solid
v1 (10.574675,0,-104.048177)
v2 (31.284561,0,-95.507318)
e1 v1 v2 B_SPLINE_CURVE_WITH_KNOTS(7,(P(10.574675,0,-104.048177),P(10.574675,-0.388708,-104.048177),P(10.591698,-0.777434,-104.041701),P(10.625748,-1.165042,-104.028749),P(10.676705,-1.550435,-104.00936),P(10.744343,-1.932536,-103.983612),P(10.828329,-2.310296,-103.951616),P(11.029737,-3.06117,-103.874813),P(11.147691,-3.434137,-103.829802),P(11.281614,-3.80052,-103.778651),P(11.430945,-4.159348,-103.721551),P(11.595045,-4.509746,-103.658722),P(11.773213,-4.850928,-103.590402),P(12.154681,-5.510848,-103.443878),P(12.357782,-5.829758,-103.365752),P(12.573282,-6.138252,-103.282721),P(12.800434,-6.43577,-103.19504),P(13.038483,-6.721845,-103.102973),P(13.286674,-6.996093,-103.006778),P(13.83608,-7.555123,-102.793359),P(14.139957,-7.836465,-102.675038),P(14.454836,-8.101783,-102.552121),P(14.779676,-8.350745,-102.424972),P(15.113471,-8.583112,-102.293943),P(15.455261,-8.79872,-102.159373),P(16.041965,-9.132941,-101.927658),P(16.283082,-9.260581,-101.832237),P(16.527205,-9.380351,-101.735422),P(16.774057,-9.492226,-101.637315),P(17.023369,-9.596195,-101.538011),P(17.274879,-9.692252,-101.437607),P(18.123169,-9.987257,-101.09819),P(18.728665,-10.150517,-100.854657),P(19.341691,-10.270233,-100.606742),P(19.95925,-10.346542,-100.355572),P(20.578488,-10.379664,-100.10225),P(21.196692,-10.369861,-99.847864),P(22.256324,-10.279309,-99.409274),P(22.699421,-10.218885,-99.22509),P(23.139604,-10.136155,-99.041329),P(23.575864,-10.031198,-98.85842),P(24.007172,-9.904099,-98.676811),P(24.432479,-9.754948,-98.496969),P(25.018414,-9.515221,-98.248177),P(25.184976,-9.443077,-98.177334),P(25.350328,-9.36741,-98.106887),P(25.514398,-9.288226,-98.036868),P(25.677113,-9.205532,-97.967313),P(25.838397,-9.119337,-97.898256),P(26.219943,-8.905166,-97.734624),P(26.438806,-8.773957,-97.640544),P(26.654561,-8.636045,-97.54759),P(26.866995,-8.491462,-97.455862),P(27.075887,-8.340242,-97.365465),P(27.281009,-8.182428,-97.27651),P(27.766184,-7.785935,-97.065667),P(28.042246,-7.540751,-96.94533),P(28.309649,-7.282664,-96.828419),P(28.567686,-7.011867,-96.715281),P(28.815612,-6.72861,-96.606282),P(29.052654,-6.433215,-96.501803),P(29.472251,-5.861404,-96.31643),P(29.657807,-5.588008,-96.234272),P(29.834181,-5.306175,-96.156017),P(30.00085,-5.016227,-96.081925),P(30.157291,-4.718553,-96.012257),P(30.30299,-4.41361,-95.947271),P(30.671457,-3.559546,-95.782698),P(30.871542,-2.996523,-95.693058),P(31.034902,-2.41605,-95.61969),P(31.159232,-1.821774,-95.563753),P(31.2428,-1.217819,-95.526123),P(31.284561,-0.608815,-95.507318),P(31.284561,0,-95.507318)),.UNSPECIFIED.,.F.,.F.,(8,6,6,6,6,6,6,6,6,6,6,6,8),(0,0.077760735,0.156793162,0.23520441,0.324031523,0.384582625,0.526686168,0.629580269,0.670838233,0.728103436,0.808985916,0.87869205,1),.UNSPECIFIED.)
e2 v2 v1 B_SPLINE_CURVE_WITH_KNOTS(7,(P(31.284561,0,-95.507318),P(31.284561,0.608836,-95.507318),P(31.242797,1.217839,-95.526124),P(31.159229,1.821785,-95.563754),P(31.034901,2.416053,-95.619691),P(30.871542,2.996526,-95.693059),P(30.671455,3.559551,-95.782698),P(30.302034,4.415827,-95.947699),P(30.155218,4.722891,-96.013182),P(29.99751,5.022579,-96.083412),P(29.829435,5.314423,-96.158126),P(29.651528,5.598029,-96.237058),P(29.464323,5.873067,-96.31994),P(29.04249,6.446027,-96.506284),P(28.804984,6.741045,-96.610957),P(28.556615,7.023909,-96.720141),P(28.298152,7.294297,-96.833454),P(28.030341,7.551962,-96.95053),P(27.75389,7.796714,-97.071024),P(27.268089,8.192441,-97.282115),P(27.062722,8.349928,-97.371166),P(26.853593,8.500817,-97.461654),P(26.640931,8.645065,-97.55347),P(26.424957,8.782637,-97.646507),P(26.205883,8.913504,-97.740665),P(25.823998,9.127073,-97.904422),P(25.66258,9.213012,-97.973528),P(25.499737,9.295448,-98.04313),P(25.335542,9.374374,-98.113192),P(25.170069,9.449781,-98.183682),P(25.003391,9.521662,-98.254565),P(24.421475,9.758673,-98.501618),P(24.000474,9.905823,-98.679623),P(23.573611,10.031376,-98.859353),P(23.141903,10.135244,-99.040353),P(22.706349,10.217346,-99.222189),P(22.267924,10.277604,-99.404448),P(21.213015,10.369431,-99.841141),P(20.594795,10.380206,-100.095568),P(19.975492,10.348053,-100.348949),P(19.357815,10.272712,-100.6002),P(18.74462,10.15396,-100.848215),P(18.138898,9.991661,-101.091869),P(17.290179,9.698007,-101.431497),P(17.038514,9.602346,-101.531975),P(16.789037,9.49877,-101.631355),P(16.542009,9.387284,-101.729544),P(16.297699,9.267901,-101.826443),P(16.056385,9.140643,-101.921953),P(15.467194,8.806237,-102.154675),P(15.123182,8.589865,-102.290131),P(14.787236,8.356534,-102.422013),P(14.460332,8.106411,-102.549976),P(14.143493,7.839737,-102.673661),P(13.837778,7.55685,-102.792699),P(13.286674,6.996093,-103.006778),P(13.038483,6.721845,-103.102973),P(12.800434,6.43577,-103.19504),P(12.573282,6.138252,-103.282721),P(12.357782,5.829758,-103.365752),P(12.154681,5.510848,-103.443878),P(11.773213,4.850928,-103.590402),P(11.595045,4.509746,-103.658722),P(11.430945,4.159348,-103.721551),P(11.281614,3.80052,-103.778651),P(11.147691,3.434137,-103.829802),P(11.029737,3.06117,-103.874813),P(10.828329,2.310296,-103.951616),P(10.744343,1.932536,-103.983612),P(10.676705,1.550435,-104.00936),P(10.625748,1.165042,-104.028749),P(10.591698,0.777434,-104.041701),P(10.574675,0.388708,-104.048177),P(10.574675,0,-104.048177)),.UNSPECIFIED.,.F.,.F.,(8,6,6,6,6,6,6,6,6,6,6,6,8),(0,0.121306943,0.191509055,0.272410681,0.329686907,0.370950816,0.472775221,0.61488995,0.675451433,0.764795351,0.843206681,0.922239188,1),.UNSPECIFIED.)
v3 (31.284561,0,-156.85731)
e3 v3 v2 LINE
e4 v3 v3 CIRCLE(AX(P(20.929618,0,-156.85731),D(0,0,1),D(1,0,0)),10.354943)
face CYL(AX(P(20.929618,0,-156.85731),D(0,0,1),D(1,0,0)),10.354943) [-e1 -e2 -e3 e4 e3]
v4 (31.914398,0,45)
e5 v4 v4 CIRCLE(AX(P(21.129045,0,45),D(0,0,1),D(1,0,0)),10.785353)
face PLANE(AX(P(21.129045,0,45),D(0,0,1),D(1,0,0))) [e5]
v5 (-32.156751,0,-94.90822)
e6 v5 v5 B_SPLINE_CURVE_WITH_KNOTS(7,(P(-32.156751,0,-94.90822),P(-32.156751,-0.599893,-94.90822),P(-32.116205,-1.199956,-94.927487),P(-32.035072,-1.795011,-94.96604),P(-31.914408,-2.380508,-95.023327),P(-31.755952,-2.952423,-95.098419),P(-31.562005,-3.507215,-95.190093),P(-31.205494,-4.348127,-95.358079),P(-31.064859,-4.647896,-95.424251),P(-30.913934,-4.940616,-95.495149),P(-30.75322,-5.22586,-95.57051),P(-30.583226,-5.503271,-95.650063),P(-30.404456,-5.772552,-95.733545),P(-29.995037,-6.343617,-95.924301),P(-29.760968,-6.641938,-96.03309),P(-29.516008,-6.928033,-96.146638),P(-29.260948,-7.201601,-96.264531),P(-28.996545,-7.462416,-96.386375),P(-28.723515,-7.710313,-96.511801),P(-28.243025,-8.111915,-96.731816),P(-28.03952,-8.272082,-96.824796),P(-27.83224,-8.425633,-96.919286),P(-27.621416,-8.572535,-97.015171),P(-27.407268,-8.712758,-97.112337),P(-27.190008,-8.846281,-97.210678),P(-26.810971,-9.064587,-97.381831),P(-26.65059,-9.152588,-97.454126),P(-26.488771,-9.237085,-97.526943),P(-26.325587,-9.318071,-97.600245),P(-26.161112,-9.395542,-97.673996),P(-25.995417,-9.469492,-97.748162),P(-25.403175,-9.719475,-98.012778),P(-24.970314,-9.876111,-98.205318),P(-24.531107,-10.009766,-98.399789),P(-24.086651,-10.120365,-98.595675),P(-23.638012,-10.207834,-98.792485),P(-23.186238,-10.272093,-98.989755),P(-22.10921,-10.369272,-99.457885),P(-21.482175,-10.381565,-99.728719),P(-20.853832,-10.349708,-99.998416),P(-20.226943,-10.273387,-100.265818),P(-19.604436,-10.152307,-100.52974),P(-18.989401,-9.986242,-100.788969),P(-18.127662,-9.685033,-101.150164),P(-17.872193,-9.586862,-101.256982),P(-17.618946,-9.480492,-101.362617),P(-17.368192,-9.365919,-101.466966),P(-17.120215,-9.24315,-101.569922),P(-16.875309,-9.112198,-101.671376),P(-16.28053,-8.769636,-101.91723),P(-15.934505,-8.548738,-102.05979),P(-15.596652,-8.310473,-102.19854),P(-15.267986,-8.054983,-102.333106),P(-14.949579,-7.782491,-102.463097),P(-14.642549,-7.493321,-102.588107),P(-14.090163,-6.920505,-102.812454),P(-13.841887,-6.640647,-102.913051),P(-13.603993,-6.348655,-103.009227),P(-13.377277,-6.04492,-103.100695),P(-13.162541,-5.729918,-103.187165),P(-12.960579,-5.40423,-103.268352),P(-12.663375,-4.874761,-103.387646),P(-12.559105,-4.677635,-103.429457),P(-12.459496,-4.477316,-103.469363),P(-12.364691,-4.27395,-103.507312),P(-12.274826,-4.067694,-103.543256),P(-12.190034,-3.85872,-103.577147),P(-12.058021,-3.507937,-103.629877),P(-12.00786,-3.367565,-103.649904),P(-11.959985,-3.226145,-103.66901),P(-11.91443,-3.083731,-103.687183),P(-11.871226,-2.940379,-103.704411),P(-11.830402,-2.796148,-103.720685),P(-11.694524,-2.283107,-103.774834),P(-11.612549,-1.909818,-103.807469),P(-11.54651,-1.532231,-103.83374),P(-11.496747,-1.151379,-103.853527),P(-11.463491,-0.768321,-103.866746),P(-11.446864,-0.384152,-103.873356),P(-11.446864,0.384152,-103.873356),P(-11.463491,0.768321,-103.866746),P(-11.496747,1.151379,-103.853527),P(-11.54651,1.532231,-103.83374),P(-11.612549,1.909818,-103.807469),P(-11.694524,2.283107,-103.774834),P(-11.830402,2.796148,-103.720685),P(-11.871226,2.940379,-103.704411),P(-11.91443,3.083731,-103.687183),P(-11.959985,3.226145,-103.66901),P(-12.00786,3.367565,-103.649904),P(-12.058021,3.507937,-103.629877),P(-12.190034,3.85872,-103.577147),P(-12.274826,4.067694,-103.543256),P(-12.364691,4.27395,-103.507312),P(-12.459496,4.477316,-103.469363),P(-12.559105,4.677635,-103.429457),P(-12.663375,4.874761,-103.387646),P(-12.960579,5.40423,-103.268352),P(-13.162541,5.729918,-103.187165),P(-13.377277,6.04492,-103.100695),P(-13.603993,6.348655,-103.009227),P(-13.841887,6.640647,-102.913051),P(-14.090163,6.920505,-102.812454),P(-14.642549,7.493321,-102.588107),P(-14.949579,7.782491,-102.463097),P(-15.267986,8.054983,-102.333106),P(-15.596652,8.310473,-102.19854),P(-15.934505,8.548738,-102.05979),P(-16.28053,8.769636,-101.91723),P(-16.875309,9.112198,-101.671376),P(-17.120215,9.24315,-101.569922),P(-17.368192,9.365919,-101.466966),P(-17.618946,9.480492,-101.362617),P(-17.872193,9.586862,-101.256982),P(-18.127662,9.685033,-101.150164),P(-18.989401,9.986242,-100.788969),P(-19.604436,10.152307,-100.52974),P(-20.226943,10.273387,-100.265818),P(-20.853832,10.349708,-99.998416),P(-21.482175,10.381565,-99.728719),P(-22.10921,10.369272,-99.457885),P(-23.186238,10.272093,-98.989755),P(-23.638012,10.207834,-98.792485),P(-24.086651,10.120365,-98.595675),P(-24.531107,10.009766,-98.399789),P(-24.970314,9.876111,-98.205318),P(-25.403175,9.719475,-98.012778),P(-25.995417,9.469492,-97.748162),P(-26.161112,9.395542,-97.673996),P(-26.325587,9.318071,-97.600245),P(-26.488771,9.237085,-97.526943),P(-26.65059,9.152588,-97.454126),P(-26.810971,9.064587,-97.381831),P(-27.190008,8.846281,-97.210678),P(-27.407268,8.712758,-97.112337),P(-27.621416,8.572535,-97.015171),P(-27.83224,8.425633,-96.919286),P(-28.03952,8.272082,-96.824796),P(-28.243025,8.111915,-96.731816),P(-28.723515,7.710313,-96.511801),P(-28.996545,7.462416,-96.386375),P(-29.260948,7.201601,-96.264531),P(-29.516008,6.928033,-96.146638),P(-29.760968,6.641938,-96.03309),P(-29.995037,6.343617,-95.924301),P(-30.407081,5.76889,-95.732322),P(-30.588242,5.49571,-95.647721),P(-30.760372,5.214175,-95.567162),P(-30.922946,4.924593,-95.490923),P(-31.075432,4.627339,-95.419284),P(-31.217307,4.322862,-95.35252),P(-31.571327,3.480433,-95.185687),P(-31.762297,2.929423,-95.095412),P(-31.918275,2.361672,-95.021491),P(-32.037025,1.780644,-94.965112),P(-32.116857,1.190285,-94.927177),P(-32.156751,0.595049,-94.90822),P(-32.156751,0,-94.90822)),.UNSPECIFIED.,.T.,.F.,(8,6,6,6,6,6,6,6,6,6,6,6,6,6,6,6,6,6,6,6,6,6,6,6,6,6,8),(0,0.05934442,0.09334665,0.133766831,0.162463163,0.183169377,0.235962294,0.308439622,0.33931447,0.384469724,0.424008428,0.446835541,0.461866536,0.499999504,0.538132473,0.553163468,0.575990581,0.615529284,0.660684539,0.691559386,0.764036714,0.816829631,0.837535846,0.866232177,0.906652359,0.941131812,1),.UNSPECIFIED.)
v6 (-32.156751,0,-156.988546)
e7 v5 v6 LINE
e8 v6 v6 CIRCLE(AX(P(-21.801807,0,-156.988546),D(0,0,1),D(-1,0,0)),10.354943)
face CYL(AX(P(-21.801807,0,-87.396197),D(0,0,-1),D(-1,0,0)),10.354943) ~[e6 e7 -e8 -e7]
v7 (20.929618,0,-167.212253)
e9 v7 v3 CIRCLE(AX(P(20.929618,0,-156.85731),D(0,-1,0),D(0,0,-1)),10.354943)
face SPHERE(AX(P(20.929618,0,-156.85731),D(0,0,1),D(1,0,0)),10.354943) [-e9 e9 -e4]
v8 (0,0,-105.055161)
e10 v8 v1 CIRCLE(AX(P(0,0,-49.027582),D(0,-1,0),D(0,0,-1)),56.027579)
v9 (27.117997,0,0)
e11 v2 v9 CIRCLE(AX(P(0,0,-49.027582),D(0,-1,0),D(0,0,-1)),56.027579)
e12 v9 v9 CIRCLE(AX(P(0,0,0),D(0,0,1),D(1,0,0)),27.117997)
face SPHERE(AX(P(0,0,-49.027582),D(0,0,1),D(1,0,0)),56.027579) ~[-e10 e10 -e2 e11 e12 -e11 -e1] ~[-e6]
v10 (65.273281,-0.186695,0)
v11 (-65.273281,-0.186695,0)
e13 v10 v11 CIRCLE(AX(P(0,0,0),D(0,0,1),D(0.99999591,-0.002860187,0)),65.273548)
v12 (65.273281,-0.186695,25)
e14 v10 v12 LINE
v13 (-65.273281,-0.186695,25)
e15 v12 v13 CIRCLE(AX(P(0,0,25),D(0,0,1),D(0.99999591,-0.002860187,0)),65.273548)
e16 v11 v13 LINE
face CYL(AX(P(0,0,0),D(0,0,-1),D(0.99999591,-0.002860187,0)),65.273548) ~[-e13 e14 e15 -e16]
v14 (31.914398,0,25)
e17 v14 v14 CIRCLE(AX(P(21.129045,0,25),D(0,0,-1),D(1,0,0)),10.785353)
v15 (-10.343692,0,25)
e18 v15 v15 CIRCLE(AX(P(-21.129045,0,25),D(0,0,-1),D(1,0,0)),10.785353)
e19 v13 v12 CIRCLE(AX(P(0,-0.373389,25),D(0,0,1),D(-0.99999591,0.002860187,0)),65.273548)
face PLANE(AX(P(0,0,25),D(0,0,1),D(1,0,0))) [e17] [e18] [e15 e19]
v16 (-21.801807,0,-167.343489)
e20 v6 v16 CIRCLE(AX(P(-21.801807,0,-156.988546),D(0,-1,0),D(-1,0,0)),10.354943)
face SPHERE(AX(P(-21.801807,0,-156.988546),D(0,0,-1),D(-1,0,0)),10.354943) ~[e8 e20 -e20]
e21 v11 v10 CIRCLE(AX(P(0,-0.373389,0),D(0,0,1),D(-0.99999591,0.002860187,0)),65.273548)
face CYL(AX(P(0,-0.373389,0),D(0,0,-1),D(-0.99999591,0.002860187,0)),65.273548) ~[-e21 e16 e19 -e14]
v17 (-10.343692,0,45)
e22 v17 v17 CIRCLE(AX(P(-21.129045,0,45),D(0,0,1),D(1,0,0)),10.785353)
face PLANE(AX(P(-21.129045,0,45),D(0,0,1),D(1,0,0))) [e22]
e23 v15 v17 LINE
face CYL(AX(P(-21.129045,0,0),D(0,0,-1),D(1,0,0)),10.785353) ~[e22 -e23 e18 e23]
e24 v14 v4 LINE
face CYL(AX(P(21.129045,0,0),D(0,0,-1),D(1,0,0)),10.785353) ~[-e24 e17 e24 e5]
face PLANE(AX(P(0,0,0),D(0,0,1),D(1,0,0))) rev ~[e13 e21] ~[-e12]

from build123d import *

# Parameters (mm, degrees)
F0_R     = 10.7853529021
F7_DEPTH = 45
F0_R_2   = 65.2735484533
F8_DEPTH = 25


with BuildPart() as f2:
    # F1 (on Front) → F2 (revolve)
    with BuildSketch(Plane.XZ):
        with BuildLine():
            ThreePointArc((0, -105.0551608205), (39.6174808002, -88.645062966), (56.0275786547, -49.0275821658))
            ThreePointArc((56.0275786547, -49.0275821658), (39.6174808002, -9.4101013656), (0, 6.9999964889))
            Line((0, 6.9999964889), (0, -105.0551608205))
        make_face()
    revolve(axis=Axis((0, 0, -49.0275821658), (0, 0, -1)))

    # F3 (on Front) → F4 (revolve)
    with BuildSketch(Plane.XZ):
        with BuildLine():
            Line((-21.801807452, -156.9885462523), (-32.1567505598, -156.9885462523))
            ThreePointArc((-32.1567505598, -156.9885462523), (-29.1238579423, -164.3105967426), (-21.801807452, -167.3434893601))
            Line((-21.801807452, -167.3434893601), (-21.801807452, -156.9885462523))
        make_face()
        with BuildLine():
            Line((-32.1567505598, -87.396197021), (-32.1567505598, -156.9885462523))
            ThreePointArc((-32.1567505598, -156.9885462523), (-29.1238579423, -149.6664957619), (-21.801807452, -146.6336031444))
            Line((-21.801807452, -146.6336031444), (-21.801807452, -87.396197021))
            Line((-21.801807452, -87.396197021), (-32.1567505598, -87.396197021))
        make_face()
        with BuildLine():
            ThreePointArc((-21.801807452, -146.6336031444), (-29.1238579423, -149.6664957619), (-32.1567505598, -156.9885462523))
            Line((-32.1567505598, -156.9885462523), (-21.801807452, -156.9885462523))
            Line((-21.801807452, -156.9885462523), (-21.801807452, -146.6336031444))
        make_face()
    revolve(axis=Axis((-21.801807452, 0, -127.3698431905), (0, 0, 1)))

    # F5 (on Front) → F6 (revolve)
    with BuildSketch(Plane.XZ):
        with BuildLine():
            Line((20.9296178073, -146.5023671743), (20.9296178073, -167.2122533899))
            ThreePointArc((20.9296178073, -167.2122533899), (28.2516682976, -164.1793607724), (31.2845609151, -156.8573102821))
            ThreePointArc((31.2845609151, -156.8573102821), (28.2516682976, -149.5352597917), (20.9296178073, -146.5023671743))
        make_face()
        with BuildLine():
            Line((20.9296178073, -87.2649610508), (20.9296178073, -146.5023671743))
            ThreePointArc((20.9296178073, -146.5023671743), (28.2516682976, -149.5352597917), (31.2845609151, -156.8573102821))
            Line((31.2845609151, -156.8573102821), (31.2845609151, -87.2649610508))
            Line((31.2845609151, -87.2649610508), (20.9296178073, -87.2649610508))
        make_face()
    revolve(axis=Axis((20.9296178073, 0, -127.2386072204), (0, 0, 1)))

    # F0 (on Top) → F7 (join)
    with BuildSketch(Plane.XY):
        with Locations((21.1290447041, 0)):
            Circle(F0_R)
        with Locations((-21.1290447041, 0)):
            Circle(F0_R)
    extrude(amount=F7_DEPTH)

    # F0 (on Top) → F8 (join)
    with BuildSketch(Plane.XY):
        Circle(F0_R_2)
        with Locations((-21.1290447041, 0)):
            Circle(F0_R, mode=Mode.SUBTRACT)
        with Locations((21.1290447041, 0)):
            Circle(F0_R, mode=Mode.SUBTRACT)
        with Locations((0, -0.3733891062)):
            Circle(F0_R_2)
    extrude(amount=F8_DEPTH)


solid = f2.part
